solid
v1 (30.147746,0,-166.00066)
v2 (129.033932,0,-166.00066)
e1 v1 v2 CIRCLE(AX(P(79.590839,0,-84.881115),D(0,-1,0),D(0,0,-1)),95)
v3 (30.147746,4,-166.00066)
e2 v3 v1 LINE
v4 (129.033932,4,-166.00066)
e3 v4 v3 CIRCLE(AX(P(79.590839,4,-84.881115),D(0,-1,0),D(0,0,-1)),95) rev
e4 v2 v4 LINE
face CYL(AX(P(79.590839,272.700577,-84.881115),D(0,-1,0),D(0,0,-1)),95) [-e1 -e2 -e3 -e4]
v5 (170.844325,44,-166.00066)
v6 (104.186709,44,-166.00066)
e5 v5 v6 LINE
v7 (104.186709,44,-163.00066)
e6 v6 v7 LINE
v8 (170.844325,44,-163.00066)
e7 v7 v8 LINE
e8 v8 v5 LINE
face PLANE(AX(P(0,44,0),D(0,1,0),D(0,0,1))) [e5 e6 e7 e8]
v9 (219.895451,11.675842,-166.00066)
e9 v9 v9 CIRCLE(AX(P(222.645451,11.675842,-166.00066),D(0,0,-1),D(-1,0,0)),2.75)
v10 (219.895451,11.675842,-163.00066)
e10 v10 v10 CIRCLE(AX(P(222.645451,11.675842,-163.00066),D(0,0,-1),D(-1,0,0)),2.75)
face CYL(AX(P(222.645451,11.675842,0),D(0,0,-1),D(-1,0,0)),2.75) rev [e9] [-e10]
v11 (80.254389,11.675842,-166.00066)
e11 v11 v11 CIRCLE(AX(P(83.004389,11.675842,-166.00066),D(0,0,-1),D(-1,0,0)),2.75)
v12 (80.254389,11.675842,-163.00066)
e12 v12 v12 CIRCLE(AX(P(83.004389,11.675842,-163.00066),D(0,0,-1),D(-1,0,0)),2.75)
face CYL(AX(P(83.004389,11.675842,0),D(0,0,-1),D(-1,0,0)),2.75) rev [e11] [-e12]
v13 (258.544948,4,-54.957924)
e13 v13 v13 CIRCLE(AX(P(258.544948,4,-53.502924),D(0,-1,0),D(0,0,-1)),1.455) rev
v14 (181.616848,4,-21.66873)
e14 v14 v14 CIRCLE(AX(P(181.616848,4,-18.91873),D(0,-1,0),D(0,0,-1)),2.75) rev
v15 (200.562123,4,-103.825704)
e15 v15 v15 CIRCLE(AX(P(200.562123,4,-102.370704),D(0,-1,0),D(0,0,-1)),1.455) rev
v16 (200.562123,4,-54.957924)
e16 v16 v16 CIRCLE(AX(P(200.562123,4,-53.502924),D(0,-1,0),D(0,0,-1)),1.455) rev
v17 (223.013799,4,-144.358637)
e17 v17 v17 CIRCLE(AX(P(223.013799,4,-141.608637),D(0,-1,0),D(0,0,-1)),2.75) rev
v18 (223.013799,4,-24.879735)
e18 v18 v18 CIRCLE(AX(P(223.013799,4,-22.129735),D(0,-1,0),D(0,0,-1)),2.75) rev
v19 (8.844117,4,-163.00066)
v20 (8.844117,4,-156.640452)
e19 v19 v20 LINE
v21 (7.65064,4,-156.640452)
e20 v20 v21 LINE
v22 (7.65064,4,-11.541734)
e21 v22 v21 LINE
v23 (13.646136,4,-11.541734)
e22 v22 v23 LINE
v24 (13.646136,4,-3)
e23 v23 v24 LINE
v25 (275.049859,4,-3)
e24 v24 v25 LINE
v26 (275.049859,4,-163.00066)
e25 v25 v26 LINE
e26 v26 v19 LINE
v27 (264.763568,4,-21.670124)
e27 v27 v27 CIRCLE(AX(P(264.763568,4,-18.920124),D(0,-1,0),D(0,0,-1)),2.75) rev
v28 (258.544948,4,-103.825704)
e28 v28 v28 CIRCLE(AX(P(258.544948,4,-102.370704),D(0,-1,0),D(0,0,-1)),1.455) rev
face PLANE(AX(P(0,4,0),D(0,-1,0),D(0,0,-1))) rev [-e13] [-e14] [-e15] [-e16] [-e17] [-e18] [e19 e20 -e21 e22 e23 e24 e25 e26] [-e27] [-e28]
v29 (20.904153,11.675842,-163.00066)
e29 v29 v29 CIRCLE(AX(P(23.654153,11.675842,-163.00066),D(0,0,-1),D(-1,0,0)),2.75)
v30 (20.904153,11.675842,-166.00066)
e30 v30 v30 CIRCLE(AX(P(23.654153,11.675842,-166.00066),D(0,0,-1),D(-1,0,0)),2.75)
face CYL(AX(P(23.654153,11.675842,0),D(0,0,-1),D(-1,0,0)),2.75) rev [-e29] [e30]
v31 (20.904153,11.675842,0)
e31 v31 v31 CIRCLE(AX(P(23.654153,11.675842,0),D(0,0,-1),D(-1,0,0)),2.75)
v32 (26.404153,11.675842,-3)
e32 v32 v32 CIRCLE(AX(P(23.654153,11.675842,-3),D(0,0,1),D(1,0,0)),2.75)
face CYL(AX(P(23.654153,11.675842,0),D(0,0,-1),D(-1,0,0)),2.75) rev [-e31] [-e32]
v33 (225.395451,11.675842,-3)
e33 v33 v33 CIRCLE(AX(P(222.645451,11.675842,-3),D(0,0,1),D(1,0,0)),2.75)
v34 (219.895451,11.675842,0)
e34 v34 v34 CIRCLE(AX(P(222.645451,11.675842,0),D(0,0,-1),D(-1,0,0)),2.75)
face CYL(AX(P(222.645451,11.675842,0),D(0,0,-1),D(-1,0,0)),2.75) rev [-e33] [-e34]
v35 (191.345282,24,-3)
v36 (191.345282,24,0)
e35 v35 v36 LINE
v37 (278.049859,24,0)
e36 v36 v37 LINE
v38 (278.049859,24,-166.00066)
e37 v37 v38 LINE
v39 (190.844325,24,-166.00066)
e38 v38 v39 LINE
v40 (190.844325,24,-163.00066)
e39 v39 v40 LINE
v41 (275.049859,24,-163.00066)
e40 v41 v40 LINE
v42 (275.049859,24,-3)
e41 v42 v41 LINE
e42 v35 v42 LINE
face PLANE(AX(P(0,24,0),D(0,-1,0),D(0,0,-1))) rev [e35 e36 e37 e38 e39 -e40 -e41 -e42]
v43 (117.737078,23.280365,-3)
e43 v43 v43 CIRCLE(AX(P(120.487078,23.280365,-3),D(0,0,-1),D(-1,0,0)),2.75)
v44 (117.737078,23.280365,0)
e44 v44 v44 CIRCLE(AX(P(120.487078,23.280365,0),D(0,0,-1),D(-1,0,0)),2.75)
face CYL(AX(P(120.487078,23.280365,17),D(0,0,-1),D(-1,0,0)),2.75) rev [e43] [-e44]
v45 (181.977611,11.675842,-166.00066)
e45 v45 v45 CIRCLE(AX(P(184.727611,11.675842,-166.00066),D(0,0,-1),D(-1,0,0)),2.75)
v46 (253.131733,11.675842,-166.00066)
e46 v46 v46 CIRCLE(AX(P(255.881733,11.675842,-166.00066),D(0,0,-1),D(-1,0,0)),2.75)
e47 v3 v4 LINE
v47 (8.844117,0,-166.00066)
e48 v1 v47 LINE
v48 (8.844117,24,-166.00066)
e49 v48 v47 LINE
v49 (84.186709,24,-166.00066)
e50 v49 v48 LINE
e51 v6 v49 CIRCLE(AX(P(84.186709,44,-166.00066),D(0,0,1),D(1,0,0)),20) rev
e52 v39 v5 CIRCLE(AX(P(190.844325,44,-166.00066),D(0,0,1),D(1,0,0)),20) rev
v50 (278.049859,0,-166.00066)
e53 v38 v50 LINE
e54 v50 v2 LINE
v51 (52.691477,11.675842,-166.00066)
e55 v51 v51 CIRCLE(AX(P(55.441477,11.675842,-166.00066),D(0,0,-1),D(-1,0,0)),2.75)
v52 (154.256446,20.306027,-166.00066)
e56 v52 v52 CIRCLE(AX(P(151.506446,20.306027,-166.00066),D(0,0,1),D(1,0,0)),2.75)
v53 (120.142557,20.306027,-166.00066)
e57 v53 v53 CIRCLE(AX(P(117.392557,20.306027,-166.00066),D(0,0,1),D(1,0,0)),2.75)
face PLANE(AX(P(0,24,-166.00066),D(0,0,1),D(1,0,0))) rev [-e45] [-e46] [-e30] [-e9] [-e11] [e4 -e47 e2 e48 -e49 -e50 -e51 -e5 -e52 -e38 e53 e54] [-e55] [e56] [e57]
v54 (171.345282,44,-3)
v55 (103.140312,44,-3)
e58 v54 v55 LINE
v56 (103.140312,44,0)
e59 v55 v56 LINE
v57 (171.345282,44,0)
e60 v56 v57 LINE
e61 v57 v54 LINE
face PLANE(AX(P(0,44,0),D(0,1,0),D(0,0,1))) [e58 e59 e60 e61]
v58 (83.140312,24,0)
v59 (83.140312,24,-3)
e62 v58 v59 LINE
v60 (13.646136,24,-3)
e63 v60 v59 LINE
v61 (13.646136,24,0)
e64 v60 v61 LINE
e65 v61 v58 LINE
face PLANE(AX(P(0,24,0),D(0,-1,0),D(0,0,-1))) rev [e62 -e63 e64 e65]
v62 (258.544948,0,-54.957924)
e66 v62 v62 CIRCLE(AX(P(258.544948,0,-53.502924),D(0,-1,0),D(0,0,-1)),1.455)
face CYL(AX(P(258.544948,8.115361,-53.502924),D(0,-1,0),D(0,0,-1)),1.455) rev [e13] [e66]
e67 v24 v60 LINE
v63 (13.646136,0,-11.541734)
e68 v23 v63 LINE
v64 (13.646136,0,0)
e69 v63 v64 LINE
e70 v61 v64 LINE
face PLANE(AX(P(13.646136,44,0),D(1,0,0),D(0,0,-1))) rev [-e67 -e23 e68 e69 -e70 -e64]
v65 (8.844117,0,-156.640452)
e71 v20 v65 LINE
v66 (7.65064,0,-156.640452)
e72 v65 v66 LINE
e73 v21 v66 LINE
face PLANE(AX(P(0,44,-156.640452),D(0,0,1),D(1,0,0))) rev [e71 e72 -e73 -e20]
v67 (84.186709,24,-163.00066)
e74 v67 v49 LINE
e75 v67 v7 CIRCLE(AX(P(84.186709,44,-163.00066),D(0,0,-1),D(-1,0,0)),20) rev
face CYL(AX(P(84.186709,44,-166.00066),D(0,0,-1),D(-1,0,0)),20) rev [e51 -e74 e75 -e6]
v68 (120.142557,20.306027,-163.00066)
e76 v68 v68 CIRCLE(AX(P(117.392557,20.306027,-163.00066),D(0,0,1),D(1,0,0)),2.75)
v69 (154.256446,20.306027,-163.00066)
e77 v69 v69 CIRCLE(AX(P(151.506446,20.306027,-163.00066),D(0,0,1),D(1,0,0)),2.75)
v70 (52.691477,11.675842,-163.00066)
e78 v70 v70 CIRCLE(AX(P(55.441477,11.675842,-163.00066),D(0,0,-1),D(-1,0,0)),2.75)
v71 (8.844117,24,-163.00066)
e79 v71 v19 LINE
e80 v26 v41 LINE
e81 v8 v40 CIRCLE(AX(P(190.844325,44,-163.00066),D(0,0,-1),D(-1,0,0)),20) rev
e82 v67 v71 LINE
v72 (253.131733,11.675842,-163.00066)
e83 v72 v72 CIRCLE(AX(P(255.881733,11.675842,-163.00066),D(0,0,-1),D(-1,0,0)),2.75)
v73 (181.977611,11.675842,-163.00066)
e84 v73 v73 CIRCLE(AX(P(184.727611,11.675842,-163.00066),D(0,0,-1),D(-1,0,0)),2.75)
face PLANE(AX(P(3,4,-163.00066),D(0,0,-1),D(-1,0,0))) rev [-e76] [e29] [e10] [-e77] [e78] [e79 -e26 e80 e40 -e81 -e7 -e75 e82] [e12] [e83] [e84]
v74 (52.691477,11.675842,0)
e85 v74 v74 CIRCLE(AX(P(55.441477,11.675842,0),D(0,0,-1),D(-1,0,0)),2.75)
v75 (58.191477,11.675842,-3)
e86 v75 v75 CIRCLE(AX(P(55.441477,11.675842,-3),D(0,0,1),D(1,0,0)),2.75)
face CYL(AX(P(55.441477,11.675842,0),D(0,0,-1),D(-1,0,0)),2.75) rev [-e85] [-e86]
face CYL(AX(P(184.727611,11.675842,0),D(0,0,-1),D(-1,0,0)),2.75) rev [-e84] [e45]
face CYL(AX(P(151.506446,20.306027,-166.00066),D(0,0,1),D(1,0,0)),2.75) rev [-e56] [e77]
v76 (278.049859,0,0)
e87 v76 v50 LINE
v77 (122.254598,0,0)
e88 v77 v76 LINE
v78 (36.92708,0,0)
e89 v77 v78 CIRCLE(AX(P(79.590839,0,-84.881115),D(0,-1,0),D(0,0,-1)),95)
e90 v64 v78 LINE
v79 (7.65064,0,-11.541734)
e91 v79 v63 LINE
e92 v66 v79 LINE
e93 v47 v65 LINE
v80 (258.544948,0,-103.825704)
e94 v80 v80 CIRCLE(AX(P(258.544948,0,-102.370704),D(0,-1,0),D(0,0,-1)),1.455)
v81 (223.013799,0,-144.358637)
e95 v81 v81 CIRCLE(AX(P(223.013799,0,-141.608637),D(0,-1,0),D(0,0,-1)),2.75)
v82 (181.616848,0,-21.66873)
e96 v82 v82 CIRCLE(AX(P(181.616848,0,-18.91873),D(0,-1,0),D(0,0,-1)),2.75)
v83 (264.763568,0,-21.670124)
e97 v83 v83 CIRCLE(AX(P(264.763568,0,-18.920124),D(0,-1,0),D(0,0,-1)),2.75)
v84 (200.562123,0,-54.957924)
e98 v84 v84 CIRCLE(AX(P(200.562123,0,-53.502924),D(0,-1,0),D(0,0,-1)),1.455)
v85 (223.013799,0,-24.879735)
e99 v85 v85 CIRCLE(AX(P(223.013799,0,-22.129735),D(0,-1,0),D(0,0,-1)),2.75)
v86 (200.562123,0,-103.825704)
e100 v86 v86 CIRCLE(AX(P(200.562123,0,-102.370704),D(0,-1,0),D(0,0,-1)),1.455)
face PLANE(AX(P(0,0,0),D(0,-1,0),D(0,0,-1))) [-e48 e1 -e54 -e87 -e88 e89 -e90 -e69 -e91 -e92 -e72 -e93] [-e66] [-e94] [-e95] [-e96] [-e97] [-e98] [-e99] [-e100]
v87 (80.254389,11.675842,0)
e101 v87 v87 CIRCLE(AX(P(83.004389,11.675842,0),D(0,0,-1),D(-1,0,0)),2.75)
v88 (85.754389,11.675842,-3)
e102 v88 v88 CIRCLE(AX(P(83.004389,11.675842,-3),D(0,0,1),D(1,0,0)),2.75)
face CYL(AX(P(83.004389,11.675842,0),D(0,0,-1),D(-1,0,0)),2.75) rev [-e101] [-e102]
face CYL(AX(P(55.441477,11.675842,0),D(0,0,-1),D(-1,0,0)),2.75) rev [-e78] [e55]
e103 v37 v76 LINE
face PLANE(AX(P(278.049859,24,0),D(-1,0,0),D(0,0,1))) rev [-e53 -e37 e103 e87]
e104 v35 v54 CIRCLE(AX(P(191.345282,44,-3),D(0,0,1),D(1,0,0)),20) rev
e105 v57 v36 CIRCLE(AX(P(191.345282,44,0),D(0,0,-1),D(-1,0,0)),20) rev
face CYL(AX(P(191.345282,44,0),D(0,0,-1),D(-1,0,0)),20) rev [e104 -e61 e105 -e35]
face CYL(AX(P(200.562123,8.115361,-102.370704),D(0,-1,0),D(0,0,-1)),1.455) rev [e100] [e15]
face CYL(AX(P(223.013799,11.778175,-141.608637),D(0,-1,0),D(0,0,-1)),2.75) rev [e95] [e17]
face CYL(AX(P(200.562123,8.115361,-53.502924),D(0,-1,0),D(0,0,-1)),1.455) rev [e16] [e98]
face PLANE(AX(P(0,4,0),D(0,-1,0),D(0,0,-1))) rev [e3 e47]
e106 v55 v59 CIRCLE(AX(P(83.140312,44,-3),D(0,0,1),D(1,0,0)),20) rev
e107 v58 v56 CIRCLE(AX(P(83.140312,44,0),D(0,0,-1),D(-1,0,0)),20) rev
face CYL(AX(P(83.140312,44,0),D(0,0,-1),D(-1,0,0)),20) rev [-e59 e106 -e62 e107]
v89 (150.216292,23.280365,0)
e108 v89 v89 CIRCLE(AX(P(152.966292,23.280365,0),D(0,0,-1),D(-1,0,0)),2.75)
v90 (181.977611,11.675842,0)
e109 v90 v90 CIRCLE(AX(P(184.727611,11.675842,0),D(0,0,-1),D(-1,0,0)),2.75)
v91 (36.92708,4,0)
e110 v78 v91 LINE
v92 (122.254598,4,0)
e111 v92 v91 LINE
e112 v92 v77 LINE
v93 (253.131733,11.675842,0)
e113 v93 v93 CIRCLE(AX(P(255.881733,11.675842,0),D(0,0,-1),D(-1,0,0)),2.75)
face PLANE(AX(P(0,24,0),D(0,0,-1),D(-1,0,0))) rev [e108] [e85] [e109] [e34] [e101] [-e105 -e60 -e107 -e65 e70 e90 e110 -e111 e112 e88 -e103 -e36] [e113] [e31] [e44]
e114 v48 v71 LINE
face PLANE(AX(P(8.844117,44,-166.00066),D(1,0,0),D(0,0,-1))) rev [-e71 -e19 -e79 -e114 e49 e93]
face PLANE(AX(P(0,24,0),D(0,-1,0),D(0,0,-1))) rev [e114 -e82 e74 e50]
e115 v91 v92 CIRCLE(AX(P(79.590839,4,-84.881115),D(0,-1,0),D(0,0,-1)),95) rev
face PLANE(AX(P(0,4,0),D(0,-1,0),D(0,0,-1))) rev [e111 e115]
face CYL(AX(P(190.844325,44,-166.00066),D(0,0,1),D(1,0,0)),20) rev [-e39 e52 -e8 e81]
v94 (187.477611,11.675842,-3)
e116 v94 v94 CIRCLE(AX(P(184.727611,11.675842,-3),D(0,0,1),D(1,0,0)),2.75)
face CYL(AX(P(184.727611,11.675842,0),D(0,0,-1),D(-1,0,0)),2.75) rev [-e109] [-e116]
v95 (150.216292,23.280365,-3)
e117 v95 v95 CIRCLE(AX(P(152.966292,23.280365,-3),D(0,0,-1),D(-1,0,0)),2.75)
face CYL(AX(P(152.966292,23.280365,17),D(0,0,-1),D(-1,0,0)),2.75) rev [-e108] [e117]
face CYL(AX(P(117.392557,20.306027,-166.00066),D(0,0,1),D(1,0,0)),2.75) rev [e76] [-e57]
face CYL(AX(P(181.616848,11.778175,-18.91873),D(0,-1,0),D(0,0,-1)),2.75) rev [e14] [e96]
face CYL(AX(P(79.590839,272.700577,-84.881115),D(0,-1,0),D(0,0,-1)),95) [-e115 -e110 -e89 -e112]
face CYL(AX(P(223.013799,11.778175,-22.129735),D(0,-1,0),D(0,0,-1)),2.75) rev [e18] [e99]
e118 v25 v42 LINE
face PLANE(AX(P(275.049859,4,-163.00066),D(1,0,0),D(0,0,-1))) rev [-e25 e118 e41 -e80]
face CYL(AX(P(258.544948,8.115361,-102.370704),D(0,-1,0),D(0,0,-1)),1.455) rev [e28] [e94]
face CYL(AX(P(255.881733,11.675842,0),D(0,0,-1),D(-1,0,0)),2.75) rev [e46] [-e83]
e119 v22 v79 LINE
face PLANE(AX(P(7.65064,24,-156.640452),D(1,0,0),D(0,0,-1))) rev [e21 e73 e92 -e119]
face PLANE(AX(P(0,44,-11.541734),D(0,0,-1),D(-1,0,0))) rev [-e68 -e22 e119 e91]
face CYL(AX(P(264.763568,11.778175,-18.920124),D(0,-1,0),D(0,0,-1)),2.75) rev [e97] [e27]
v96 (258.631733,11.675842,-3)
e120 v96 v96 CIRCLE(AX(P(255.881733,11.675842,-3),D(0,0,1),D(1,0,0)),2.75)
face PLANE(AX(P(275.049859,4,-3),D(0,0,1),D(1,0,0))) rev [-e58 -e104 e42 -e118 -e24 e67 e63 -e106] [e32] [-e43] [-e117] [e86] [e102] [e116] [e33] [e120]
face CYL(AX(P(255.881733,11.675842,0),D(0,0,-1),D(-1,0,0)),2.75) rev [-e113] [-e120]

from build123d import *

# Parameters (mm, degrees)
SKETCH1_W              = 278.049859422
SKETCH1_H              = 166.000659628
BOSS_EXTRUDE1_DEPTH    = 24
SKETCH2_W              = 21.890830047
SKETCH2_H              = 145.09871859
CUT_EXTRUDE1_DEPTH     = 325.721331793
SKETCH3_W              = 272.049859422
SKETCH3_H              = 160.000659628
CUT_EXTRUDE2_DEPTH     = 20
SKETCH4_W              = 68.204970116
SKETCH4_H              = 3
BOSS_EXTRUDE2_DEPTH    = 20
FILLET4_R              = 20
FILLET5_R              = 20
SKETCH5_W              = 66.657615254
SKETCH5_H              = 3
BOSS_EXTRUDE3_DEPTH    = 20
FILLET6_R              = 20
FILLET7_R              = 20
SKETCH6_R              = 2.75
HOLESFORBOLTS1_DEPTH   = 326.295157302
SKETCH7_R              = 2.75
CUT_EXTRUDE4_DEPTH     = 327.808725896
SKETCH8_R              = 2.75
CUT_EXTRUDE5_DEPTH     = 20
SKETCH11_W             = 13.646136269
SKETCH11_H             = 11.541733762
CUT_EXTRUDE6_DEPTH     = 327.808725896
SKETCH12_W             = 8.844116654
SKETCH12_H             = 9.360207276
CUT_EXTRUDE7_DEPTH     = 327.808725896
HOLESINLIDFORPICOVER_R = 2.75
CUT_EXTRUDE8_DEPTH     = 4
LIDHOLESFORPI_R        = 1.455
CUT_EXTRUDE9_DEPTH     = 4
SKETCH14_R             = 2.75
CUT_EXTRUDE10_DEPTH    = 4
SKETCH15_R             = 95
BOSS_EXTRUDE4_DEPTH    = 4
SKETCH16_W             = 38.061392729
SKETCH16_H             = 124.714605982
CUT_EXTRUDE11_DEPTH    = 4


with BuildPart() as part:
    # Sketch1 → Boss-Extrude1 (new body)
    with BuildSketch(Plane(origin=(0, 0, 0), x_dir=(1, 0, 0), z_dir=(0, 1, 0))):
        with Locations((139.024929711, 83.000329814)):
            Rectangle(SKETCH1_W, SKETCH1_H)
    extrude(amount=BOSS_EXTRUDE1_DEPTH)

    # Sketch2 → Cut-Extrude1 (cut, through all)
    with BuildSketch(Plane(origin=(0, 0, 0), x_dir=(-1, 0, 0), z_dir=(0, -1, 0))):
        with Locations((3.29477533, 84.091093057)):
            Rectangle(SKETCH2_W, SKETCH2_H)
    extrude(amount=-CUT_EXTRUDE1_DEPTH, mode=Mode.SUBTRACT)

    # Sketch3 → Cut-Extrude2 (cut)
    with BuildSketch(Plane(origin=(0, 24, 0), x_dir=(1, 0, 0), z_dir=(0, 1, 0))):
        with Locations((139.024929711, 83.000329814)):
            Rectangle(SKETCH3_W, SKETCH3_H)
    extrude(amount=-CUT_EXTRUDE2_DEPTH, mode=Mode.SUBTRACT)

    # Sketch4 → Boss-Extrude2 (add)
    with BuildSketch(Plane(origin=(0, 24, 0), x_dir=(1, 0, 0), z_dir=(0, 1, 0))):
        with Locations((137.24279725, 1.5)):
            Rectangle(SKETCH4_W, SKETCH4_H)
    extrude(amount=BOSS_EXTRUDE2_DEPTH)

    # Fillet4
    fillet4_edges = [part.edges().sort_by_distance(p)[0] for p in [
        (103.140312192, 24, -1.5),
    ]]
    fillet(fillet4_edges, radius=FILLET4_R - 0.0001)  # a hair under: the kernel refuses the full size

    # Fillet5
    fillet5_edges = [part.edges().sort_by_distance(p)[0] for p in [
        (171.345282308, 24, -1.5),
    ]]
    fillet(fillet5_edges, radius=FILLET5_R - 0.0001)  # a hair under: the kernel refuses the full size

    # Sketch5 → Boss-Extrude3 (add)
    with BuildSketch(Plane(origin=(0, 24, 0), x_dir=(1, 0, 0), z_dir=(0, 1, 0))):
        with Locations((137.51551703, 164.500659628)):
            Rectangle(SKETCH5_W, SKETCH5_H)
    extrude(amount=BOSS_EXTRUDE3_DEPTH)

    # Fillet6
    fillet6_edges = [part.edges().sort_by_distance(p)[0] for p in [
        (104.186709403, 24, -164.500659628),
    ]]
    fillet(fillet6_edges, radius=FILLET6_R - 0.0001)  # a hair under: the kernel refuses the full size

    # Fillet7
    fillet7_edges = [part.edges().sort_by_distance(p)[0] for p in [
        (170.844324657, 24, -164.500659628),
    ]]
    fillet(fillet7_edges, radius=FILLET7_R - 0.0001)  # a hair under: the kernel refuses the full size

    # Sketch6 → HolesForBolts1 (cut, through all)
    with BuildSketch(Plane.XY.offset(-163.000659628)):
        with Locations((151.506445743, 20.306027196)):
            Circle(SKETCH6_R)
        with Locations((117.392557181, 20.306027196)):
            Circle(SKETCH6_R)
    extrude(amount=-HOLESFORBOLTS1_DEPTH, mode=Mode.SUBTRACT)

    # Sketch7 → Cut-Extrude4 (cut, through all)
    with BuildSketch(Plane(origin=(0, 0, -166.000659628), x_dir=(-1, 0, 0), z_dir=(0, 0, -1))):
        with Locations((-23.654153003, 11.675842417)):
            Circle(SKETCH7_R)
        with Locations((-55.441477074, 11.675842417)):
            Circle(SKETCH7_R)
        with Locations((-83.004388954, 11.675842417)):
            Circle(SKETCH7_R)
        with Locations((-184.727610529, 11.675842417)):
            Circle(SKETCH7_R)
        with Locations((-222.645451091, 11.675842417)):
            Circle(SKETCH7_R)
        with Locations((-255.881733076, 11.675842417)):
            Circle(SKETCH7_R)
    extrude(amount=-CUT_EXTRUDE4_DEPTH, mode=Mode.SUBTRACT)

    # Sketch8 → Cut-Extrude5 (cut)
    with BuildSketch(Plane(origin=(0, 0, -3), x_dir=(-1, 0, 0), z_dir=(0, 0, -1))):
        with Locations((-120.487078085, 23.280365191)):
            Circle(SKETCH8_R)
        with Locations((-152.966291723, 23.280365191)):
            Circle(SKETCH8_R)
    extrude(amount=-CUT_EXTRUDE5_DEPTH, mode=Mode.SUBTRACT)

    # Sketch11 → Cut-Extrude6 (cut, through all)
    with BuildSketch(Plane.XZ):
        with Locations((6.823068135, -5.770866881)):
            Rectangle(SKETCH11_W, SKETCH11_H)
    extrude(amount=-CUT_EXTRUDE6_DEPTH, mode=Mode.SUBTRACT)

    # Sketch12 → Cut-Extrude7 (cut, through all)
    with BuildSketch(Plane.XZ):
        with Locations((4.422058327, -161.32055599)):
            Rectangle(SKETCH12_W, SKETCH12_H)
    extrude(amount=-CUT_EXTRUDE7_DEPTH, mode=Mode.SUBTRACT)

    # HolesInLidForPiCover → Cut-Extrude8 (cut)
    with BuildSketch(Plane.XZ):
        with Locations(Location((223.013799051, -141.608636884, 0), (0, 0, 270))):
            Circle(HOLESINLIDFORPICOVER_R)
        with Locations(Location((223.013799051, -22.129735073, 0), (0, 0, 270))):
            Circle(HOLESINLIDFORPICOVER_R)
    extrude(amount=-CUT_EXTRUDE8_DEPTH, mode=Mode.SUBTRACT)

    # LidHolesForPi → Cut-Extrude9 (cut)
    with BuildSketch(Plane.XZ):
        with Locations(Location((200.562123112, -102.370703816, 0), (0, 0, 270))):
            Circle(LIDHOLESFORPI_R)
        with Locations(Location((200.562123112, -53.502923562, 0), (0, 0, 270))):
            Circle(LIDHOLESFORPI_R)
        with Locations(Location((258.544947711, -53.502923562, 0), (0, 0, 270))):
            Circle(LIDHOLESFORPI_R)
        with Locations(Location((258.544947711, -102.370703816, 0), (0, 0, 270))):
            Circle(LIDHOLESFORPI_R)
    extrude(amount=-CUT_EXTRUDE9_DEPTH, mode=Mode.SUBTRACT)

    # Sketch14 → Cut-Extrude10 (cut)
    with BuildSketch(Plane.XZ):
        with Locations(Location((264.763568483, -18.920123653, 0), (0, 0, 270))):
            Circle(SKETCH14_R)
        with Locations(Location((181.616848195, -18.918729826, 0), (0, 0, 270))):
            Circle(SKETCH14_R)
    extrude(amount=-CUT_EXTRUDE10_DEPTH, mode=Mode.SUBTRACT)

    # Sketch15 → Boss-Extrude4 (add)
    with BuildSketch(Plane.XZ):
        with Locations((79.590839171, -84.881114817)):
            Circle(SKETCH15_R)
    extrude(amount=-BOSS_EXTRUDE4_DEPTH)

    # Sketch16 → Cut-Extrude11 (cut)
    with BuildSketch(Plane.XZ):
        with Locations((-11.380056671, -85.193210909)):
            Rectangle(SKETCH16_W, SKETCH16_H)
    extrude(amount=-CUT_EXTRUDE11_DEPTH, mode=Mode.SUBTRACT)


solid = part.part
